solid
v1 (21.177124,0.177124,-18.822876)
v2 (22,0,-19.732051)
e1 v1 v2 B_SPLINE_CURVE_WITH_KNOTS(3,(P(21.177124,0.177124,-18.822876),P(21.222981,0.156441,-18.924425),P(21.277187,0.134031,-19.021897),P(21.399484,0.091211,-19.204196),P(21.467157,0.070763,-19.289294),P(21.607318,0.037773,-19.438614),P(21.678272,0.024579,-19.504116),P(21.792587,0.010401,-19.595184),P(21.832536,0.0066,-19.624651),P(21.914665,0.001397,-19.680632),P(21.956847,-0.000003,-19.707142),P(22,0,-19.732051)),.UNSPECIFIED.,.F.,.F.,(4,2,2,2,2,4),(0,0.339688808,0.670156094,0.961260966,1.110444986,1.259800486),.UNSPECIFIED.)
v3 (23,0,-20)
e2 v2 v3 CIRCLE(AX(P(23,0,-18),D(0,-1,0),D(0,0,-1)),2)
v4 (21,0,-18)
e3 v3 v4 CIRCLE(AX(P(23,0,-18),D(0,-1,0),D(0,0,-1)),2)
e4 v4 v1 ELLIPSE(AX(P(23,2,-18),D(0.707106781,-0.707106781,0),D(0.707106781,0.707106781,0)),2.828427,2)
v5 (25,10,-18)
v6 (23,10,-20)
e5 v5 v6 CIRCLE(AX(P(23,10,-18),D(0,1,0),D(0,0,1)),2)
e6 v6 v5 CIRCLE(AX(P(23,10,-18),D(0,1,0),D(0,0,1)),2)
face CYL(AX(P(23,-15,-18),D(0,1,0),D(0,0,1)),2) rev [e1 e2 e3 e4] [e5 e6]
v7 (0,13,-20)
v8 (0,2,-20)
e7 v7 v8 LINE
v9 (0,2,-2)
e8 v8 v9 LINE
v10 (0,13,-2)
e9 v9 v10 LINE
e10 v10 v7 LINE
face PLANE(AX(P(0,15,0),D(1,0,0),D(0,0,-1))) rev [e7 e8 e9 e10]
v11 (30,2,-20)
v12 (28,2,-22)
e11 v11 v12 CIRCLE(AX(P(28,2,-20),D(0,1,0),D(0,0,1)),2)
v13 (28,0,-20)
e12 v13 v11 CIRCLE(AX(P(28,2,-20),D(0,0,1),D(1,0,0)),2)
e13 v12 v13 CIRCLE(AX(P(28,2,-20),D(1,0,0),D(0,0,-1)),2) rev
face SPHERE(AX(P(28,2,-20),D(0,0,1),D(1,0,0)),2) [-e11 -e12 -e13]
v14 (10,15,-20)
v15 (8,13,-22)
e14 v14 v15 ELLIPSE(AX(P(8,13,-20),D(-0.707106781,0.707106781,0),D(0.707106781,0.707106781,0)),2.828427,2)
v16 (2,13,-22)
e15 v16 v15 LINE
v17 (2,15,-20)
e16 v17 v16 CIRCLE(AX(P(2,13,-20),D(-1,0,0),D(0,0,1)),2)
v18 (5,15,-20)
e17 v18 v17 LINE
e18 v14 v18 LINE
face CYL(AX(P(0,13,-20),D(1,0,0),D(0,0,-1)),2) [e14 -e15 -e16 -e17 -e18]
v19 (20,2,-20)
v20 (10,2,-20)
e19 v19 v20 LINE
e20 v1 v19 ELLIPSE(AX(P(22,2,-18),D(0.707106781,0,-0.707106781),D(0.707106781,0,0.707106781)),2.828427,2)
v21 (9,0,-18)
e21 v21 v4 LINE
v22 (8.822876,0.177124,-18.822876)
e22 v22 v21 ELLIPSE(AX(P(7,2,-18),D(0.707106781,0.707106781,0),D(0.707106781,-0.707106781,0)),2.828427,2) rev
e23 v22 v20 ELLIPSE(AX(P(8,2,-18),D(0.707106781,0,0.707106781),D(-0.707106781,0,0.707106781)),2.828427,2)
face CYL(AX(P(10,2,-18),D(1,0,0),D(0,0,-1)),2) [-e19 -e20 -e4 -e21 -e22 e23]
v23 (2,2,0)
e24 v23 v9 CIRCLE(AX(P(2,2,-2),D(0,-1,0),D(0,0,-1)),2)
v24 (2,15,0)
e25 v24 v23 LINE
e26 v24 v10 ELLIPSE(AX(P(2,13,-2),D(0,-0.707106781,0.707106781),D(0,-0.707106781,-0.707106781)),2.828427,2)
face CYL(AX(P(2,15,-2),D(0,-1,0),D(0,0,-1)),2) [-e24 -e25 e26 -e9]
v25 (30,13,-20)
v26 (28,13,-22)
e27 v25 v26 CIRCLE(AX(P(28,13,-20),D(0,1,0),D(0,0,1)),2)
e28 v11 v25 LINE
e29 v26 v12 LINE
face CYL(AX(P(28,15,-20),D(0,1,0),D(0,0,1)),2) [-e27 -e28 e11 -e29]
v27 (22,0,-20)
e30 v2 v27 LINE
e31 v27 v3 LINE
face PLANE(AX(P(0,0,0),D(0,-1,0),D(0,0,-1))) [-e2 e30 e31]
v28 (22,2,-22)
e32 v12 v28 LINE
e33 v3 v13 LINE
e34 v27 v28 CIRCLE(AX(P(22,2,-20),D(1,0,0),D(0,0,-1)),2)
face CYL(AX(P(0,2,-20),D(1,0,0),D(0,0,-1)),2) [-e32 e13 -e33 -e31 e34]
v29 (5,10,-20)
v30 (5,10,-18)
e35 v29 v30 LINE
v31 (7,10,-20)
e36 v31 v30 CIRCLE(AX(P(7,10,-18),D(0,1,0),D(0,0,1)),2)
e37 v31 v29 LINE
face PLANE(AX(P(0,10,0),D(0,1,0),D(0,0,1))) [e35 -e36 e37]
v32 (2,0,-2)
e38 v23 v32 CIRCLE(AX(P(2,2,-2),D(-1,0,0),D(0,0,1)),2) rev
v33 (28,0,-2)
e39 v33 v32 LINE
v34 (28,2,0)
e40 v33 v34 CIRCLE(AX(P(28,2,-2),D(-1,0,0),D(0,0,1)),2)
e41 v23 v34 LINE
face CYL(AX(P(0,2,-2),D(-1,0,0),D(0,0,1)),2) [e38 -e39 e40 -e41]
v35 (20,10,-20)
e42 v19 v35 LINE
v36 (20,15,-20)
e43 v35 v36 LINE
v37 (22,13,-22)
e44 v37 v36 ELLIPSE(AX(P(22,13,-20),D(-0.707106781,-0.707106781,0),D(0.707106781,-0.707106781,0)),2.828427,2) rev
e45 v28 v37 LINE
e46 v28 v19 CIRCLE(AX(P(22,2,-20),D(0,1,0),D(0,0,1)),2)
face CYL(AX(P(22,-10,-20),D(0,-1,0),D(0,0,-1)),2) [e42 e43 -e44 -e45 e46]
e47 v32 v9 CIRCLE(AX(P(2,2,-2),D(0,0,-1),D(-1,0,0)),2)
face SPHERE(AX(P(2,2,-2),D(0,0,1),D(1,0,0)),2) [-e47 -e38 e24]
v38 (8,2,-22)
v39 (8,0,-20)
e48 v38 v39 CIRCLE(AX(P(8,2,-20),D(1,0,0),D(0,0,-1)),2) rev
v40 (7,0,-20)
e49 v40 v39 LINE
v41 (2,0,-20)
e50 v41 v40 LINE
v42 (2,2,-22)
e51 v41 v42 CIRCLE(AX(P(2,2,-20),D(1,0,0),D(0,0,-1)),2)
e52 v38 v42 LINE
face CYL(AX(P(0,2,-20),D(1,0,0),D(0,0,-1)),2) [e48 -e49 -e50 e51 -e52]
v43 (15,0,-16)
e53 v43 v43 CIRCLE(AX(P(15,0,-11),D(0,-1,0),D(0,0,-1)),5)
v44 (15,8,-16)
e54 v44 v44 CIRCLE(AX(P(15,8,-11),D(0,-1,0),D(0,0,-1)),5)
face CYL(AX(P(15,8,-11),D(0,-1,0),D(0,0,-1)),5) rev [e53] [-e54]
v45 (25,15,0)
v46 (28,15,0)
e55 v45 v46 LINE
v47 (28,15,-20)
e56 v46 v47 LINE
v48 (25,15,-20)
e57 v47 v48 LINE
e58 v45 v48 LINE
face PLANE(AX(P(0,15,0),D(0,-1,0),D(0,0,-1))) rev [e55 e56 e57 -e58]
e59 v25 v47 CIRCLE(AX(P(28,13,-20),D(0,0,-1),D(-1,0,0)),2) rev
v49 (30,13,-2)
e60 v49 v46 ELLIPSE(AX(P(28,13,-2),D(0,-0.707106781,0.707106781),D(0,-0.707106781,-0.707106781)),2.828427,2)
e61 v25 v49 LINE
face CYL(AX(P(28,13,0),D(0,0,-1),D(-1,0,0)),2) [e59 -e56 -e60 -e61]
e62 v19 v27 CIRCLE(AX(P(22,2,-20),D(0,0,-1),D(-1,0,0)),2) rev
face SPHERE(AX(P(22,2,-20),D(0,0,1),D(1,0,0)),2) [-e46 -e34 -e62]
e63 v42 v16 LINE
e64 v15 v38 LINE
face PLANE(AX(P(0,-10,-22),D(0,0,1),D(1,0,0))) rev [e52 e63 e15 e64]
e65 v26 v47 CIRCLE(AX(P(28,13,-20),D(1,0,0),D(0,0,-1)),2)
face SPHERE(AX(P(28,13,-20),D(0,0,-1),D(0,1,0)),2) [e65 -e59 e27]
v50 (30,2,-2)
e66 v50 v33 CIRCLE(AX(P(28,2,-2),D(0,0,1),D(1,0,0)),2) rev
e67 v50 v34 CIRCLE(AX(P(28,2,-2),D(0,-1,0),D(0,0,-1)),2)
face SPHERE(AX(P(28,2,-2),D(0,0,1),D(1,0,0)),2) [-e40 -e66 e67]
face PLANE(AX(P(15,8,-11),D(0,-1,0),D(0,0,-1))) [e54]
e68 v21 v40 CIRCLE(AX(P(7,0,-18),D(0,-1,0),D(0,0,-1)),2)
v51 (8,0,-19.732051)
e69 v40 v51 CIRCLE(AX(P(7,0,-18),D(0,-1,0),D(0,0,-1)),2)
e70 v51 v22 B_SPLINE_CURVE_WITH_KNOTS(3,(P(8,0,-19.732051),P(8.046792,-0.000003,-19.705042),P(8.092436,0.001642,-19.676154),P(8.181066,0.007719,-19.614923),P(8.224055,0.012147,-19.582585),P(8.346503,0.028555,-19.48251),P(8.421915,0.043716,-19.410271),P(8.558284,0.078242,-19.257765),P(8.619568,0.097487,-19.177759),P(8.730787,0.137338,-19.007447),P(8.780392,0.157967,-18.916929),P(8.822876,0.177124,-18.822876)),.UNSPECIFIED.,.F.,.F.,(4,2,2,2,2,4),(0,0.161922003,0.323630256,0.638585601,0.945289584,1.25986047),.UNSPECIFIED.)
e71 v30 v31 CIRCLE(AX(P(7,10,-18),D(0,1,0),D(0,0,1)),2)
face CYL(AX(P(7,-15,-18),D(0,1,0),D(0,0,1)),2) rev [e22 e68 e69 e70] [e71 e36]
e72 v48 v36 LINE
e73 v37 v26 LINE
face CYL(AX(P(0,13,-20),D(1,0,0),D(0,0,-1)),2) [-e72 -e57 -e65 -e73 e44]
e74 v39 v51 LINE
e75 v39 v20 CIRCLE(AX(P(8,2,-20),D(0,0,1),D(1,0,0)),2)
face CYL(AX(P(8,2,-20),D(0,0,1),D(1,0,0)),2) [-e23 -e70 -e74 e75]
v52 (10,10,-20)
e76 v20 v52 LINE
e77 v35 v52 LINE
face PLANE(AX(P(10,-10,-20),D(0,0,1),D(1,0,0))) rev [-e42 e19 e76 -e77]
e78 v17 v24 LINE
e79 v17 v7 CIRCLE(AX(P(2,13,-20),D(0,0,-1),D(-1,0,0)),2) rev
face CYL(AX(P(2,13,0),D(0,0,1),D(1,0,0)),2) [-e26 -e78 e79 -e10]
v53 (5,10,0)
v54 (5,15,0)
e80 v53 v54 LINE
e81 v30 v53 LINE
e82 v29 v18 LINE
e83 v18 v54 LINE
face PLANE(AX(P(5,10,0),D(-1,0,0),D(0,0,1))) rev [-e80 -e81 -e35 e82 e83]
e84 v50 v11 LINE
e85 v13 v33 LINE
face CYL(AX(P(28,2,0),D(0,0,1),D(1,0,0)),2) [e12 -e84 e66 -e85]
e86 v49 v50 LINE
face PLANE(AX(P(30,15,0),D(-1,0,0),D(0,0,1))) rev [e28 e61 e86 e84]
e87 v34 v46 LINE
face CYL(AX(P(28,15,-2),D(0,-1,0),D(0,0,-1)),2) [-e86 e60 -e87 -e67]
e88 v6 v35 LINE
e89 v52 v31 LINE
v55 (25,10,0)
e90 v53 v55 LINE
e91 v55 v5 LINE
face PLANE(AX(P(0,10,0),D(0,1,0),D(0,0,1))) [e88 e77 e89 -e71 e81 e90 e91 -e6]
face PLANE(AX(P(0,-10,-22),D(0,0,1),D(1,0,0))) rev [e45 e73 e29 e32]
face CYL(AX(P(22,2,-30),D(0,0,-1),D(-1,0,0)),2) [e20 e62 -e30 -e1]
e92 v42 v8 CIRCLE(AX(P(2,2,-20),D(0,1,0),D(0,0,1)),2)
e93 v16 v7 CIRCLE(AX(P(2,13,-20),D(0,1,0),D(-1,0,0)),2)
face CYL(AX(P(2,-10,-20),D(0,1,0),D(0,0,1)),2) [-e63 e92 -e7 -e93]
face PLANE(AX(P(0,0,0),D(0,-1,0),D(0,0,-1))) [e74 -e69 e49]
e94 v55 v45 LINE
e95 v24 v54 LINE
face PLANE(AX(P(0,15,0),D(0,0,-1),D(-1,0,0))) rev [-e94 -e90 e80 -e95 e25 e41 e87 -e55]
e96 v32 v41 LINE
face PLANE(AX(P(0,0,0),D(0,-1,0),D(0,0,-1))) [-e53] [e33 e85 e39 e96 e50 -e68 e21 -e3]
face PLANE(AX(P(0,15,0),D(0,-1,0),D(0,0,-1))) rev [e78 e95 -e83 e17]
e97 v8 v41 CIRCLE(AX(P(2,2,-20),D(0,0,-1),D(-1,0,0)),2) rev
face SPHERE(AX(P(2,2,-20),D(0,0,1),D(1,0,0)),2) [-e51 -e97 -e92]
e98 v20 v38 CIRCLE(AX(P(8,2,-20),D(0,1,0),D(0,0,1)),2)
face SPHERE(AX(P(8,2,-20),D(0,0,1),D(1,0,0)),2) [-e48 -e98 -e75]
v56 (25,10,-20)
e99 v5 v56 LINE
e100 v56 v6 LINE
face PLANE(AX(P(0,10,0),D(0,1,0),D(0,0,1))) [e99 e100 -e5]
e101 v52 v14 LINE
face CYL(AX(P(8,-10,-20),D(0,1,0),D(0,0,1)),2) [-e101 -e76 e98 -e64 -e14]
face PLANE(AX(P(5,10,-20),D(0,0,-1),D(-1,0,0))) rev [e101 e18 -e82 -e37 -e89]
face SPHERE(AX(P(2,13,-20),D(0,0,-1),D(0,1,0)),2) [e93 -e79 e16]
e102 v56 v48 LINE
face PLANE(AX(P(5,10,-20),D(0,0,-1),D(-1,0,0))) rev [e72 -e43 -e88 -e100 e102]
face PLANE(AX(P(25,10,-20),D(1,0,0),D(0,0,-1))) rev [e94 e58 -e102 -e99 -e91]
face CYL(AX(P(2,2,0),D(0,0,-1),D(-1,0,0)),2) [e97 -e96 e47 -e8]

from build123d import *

# Parameters (mm, degrees)
SKETCH1_W           = 30
SKETCH1_H           = 30
BOSS_EXTRUDE2_DEPTH = 15
SKETCH3_W           = 20
SKETCH3_H           = 20
CUT_EXTRUDE1_DEPTH  = 5
SKETCH4_R           = 5
CUT_EXTRUDE2_DEPTH  = 8
SKETCH7_R           = 2
CUT_EXTRUDE4_DEPTH  = 25
SKETCH8_W           = 10
SKETCH8_H           = 10
CUT_EXTRUDE7_DEPTH  = 25
SKETCH9_W           = 30
SKETCH9_H           = 8
CUT_EXTRUDE8_DEPTH  = 25
FILLET1_R           = 2
FILLET2_R           = 2


with BuildPart() as part:
    # Sketch1 → Boss-Extrude2 (new body)
    with BuildSketch(Plane(origin=(0, 0, 0), x_dir=(1, 0, 0), z_dir=(0, 1, 0))):
        with Locations((15, 15)):
            Rectangle(SKETCH1_W, SKETCH1_H)
    extrude(amount=BOSS_EXTRUDE2_DEPTH)

    # Sketch3 → Cut-Extrude1 (cut)
    with BuildSketch(Plane(origin=(0, 15, 0), x_dir=(1, 0, 0), z_dir=(0, 1, 0))):
        with Locations((15, 10)):
            Rectangle(SKETCH3_W, SKETCH3_H)
    extrude(amount=-CUT_EXTRUDE1_DEPTH, mode=Mode.SUBTRACT)

    # Sketch4 → Cut-Extrude2 (cut)
    with BuildSketch(Plane.XZ):
        with Locations(Location((15, -11, 0), (0, 0, 270))):
            Circle(SKETCH4_R)
    extrude(amount=-CUT_EXTRUDE2_DEPTH, mode=Mode.SUBTRACT)

    # Sketch7 → Cut-Extrude4 (cut)
    with BuildSketch(Plane(origin=(0, 10, 0), x_dir=(1, 0, 0), z_dir=(0, 1, 0))):
        with Locations(Location((7, 18, 0), (0, 0, 90))):
            Circle(SKETCH7_R)
        with Locations(Location((23, 18, 0), (0, 0, 90))):
            Circle(SKETCH7_R)
    extrude(amount=-CUT_EXTRUDE4_DEPTH, mode=Mode.SUBTRACT)

    # Sketch8 → Cut-Extrude7 (cut)
    with BuildSketch(Plane(origin=(0, 15, 0), x_dir=(1, 0, 0), z_dir=(0, 1, 0))):
        with Locations((15, 25)):
            Rectangle(SKETCH8_W, SKETCH8_H)
    extrude(amount=-CUT_EXTRUDE7_DEPTH, mode=Mode.SUBTRACT)

    # Sketch9 → Cut-Extrude8 (cut)
    with BuildSketch(Plane(origin=(0, 15, 0), x_dir=(1, 0, 0), z_dir=(0, 1, 0))):
        with Locations((15, 26)):
            Rectangle(SKETCH9_W, SKETCH9_H)
    extrude(amount=-CUT_EXTRUDE8_DEPTH, mode=Mode.SUBTRACT)

    # Fillet1
    # the kernel refuses this fillet: 2 mm, written as the material it takes off along each edge
    with BuildSketch(Plane(origin=(20, 0, -20), x_dir=(1, 0, 0), z_dir=(0, 0, -1)), Plane(origin=(10, 0, -27), x_dir=(-1, 0, 0), z_dir=(0, 0, 1))) as fillet1_piece_1:
        with BuildLine():
            CenterArc((FILLET1_R, -FILLET1_R), FILLET1_R, 90, 90)
            Line((0, -FILLET1_R), (0, 0))
            Line((0, 0), (FILLET1_R, 0))
        make_face()
    extrude(amount=7, mode=Mode.SUBTRACT)
    with BuildSketch(Plane(origin=(10, 0, -20), x_dir=(0, 0, 1), z_dir=(1, 0, 0))) as fillet1_piece_2:
        with BuildLine():
            CenterArc((FILLET1_R, -FILLET1_R), FILLET1_R, 90, 90)
            Line((0, -FILLET1_R), (0, 0))
            Line((0, 0), (FILLET1_R, 0))
        make_face()
    extrude(amount=10, mode=Mode.SUBTRACT)
    with BuildSketch(Plane(origin=(15, 0, -22), x_dir=(0, 0, 1), z_dir=(-1, 0, 0)), Plane(origin=(35, 0, -22), x_dir=(0, 0, 1), z_dir=(-1, 0, 0))) as fillet1_piece_3:
        with BuildLine():
            CenterArc((FILLET1_R, FILLET1_R), FILLET1_R, 180, 90)
            Line((0, FILLET1_R), (0, 0))
            Line((0, 0), (FILLET1_R, 0))
        make_face()
    extrude(amount=20, mode=Mode.SUBTRACT)
    with BuildSketch(Plane(origin=(0, 0, -27), x_dir=(1, 0, 0), z_dir=(0, 0, 1)), Plane(origin=(30, 0, 5), x_dir=(-1, 0, 0), z_dir=(0, 0, -1))) as fillet1_piece_4:
        with BuildLine():
            CenterArc((FILLET1_R, FILLET1_R), FILLET1_R, 180, 90)
            Line((0, FILLET1_R), (0, 0))
            Line((0, 0), (FILLET1_R, 0))
        make_face()
    extrude(amount=32, mode=Mode.SUBTRACT)
    with BuildSketch(Plane(origin=(-5, 0, 0), x_dir=(0, 1, 0), z_dir=(1, 0, 0))) as fillet1_piece_5:
        with BuildLine():
            CenterArc((FILLET1_R, -FILLET1_R), FILLET1_R, 90, 90)
            Line((0, -FILLET1_R), (0, 0))
            Line((0, 0), (FILLET1_R, 0))
        make_face()
    extrude(amount=40, mode=Mode.SUBTRACT)
    with BuildSketch(Plane(origin=(10, 0, -20), x_dir=(0, 0, 1), z_dir=(1, 0, 0))) as fillet1_piece_6a_section:
        with BuildLine():
            CenterArc((FILLET1_R, -FILLET1_R), FILLET1_R, 90, 90)
            Line((0, -FILLET1_R), (0, 0))
            Line((0, 0), (FILLET1_R, 0))
        make_face()
    fillet1_piece_6a = extrude(amount=15, mode=Mode.PRIVATE)
    fillet1_piece_6a = split(fillet1_piece_6a, bisect_by=Plane(origin=(20, 0.452790229, -19.547209771), z_dir=(1, 0, 0)), keep=Keep.TOP, mode=Mode.PRIVATE)
    with BuildSketch(Plane(origin=(20, 0, -15), x_dir=(1, 0, 0), z_dir=(0, 0, -1))) as fillet1_piece_6b_section:
        with BuildLine():
            CenterArc((FILLET1_R, -FILLET1_R), FILLET1_R, 90, 90)
            Line((0, -FILLET1_R), (0, 0))
            Line((0, 0), (FILLET1_R, 0))
        make_face()
    fillet1_piece_6b = extrude(amount=12, mode=Mode.PRIVATE)
    fillet1_piece_6b = split(fillet1_piece_6b, bisect_by=Plane(origin=(20.452790229, 0.452790229, -20), z_dir=(0, 0, 1)), keep=Keep.TOP, mode=Mode.PRIVATE)
    fillet1_piece_6 = fillet1_piece_6a & fillet1_piece_6b
    add(fillet1_piece_6, mode=Mode.SUBTRACT)
    with BuildSketch(Plane(origin=(10, 0, -27), x_dir=(-1, 0, 0), z_dir=(0, 0, 1))) as fillet1_piece_7a_section:
        with BuildLine():
            CenterArc((FILLET1_R, -FILLET1_R), FILLET1_R, 90, 90)
            Line((0, -FILLET1_R), (0, 0))
            Line((0, 0), (FILLET1_R, 0))
        make_face()
    fillet1_piece_7a = extrude(amount=12, mode=Mode.PRIVATE)
    fillet1_piece_7a = split(fillet1_piece_7a, bisect_by=Plane(origin=(9.547209771, 0.452790229, -20), z_dir=(0, 0, 1)), keep=Keep.TOP, mode=Mode.PRIVATE)
    with BuildSketch(Plane(origin=(5, 0, -20), x_dir=(0, 0, 1), z_dir=(1, 0, 0))) as fillet1_piece_7b_section:
        with BuildLine():
            CenterArc((FILLET1_R, -FILLET1_R), FILLET1_R, 90, 90)
            Line((0, -FILLET1_R), (0, 0))
            Line((0, 0), (FILLET1_R, 0))
        make_face()
    fillet1_piece_7b = extrude(amount=15, mode=Mode.PRIVATE)
    fillet1_piece_7b = split(fillet1_piece_7b, bisect_by=Plane(origin=(10, 0.452790229, -19.547209771), z_dir=(-1, 0, 0)), keep=Keep.TOP, mode=Mode.PRIVATE)
    fillet1_piece_7 = fillet1_piece_7a & fillet1_piece_7b
    add(fillet1_piece_7, mode=Mode.SUBTRACT)

    # Fillet2
    # the kernel refuses this fillet: 2 mm, written as the material it takes off along each edge
    with BuildSketch(Plane(origin=(2, 2, -2), x_dir=(-1, 0, 0), z_dir=(0, 0, 1))) as fillet2_piece_1_section:
        Polygon((0, 0), (FILLET2_R, 0), (FILLET2_R, FILLET2_R), (0, FILLET2_R), align=None)
    fillet2_piece_1 = extrude(amount=FILLET2_R, mode=Mode.PRIVATE)
    fillet2_piece_1 = fillet2_piece_1 - Plane(origin=(2, 2, -2), x_dir=(0.7071067811865475, 0.7071067811865475, 0), z_dir=(0, 0, 1)) * Sphere(FILLET2_R, mode=Mode.PRIVATE)
    add(fillet2_piece_1, mode=Mode.SUBTRACT)
    with BuildSketch(Plane(origin=(2, 2, -20), x_dir=(0, 0, -1), z_dir=(-1, 0, 0))) as fillet2_piece_2_section:
        Polygon((0, 0), (FILLET2_R, 0), (FILLET2_R, FILLET2_R), (0, FILLET2_R), align=None)
    fillet2_piece_2 = extrude(amount=FILLET2_R, mode=Mode.PRIVATE)
    fillet2_piece_2 = fillet2_piece_2 - Plane(origin=(2, 2, -20), x_dir=(0, 0.7071067811865475, 0.7071067811865475), z_dir=(-1, 0, 0)) * Sphere(FILLET2_R, mode=Mode.PRIVATE)
    add(fillet2_piece_2, mode=Mode.SUBTRACT)
    with BuildSketch(Plane(origin=(8, 2, -20), x_dir=(1, 0, 0), z_dir=(0, 0, -1))) as fillet2_piece_3_section:
        Polygon((0, 0), (FILLET2_R, 0), (FILLET2_R, FILLET2_R), (0, FILLET2_R), align=None)
    fillet2_piece_3 = extrude(amount=FILLET2_R, mode=Mode.PRIVATE)
    fillet2_piece_3 = fillet2_piece_3 - Plane(origin=(8, 2, -20), x_dir=(-0.7071067811865475, 0.7071067811865475, 0), z_dir=(0, 0, -1)) * Sphere(FILLET2_R, mode=Mode.PRIVATE)
    add(fillet2_piece_3, mode=Mode.SUBTRACT)
    with BuildSketch(Plane(origin=(28, 2, -2), x_dir=(1, 0, 0), z_dir=(0, 0, 1))) as fillet2_piece_4_section:
        Polygon((0, 0), (FILLET2_R, 0), (FILLET2_R, -FILLET2_R), (0, -FILLET2_R), align=None)
    fillet2_piece_4 = extrude(amount=FILLET2_R, mode=Mode.PRIVATE)
    fillet2_piece_4 = fillet2_piece_4 - Plane(origin=(28, 2, -2), x_dir=(-0.7071067811865475, 0.7071067811865475, 0), z_dir=(0, 0, 1)) * Sphere(FILLET2_R, mode=Mode.PRIVATE)
    add(fillet2_piece_4, mode=Mode.SUBTRACT)
    with BuildSketch(Plane(origin=(22, 2, -20), x_dir=(0, 0, -1), z_dir=(-1, 0, 0))) as fillet2_piece_5_section:
        Polygon((0, 0), (FILLET2_R, 0), (FILLET2_R, FILLET2_R), (0, FILLET2_R), align=None)
    fillet2_piece_5 = extrude(amount=FILLET2_R, mode=Mode.PRIVATE)
    fillet2_piece_5 = fillet2_piece_5 - Plane(origin=(22, 2, -20), x_dir=(0, 0.7071067811865475, 0.7071067811865475), z_dir=(-1, 0, 0)) * Sphere(FILLET2_R, mode=Mode.PRIVATE)
    add(fillet2_piece_5, mode=Mode.SUBTRACT)
    with BuildSketch(Plane(origin=(28, 2, -20), x_dir=(1, 0, 0), z_dir=(0, 0, -1))) as fillet2_piece_6_section:
        Polygon((0, 0), (FILLET2_R, 0), (FILLET2_R, FILLET2_R), (0, FILLET2_R), align=None)
    fillet2_piece_6 = extrude(amount=FILLET2_R, mode=Mode.PRIVATE)
    fillet2_piece_6 = fillet2_piece_6 - Plane(origin=(28, 2, -20), x_dir=(-0.7071067811865475, 0.7071067811865475, 0), z_dir=(0, 0, -1)) * Sphere(FILLET2_R, mode=Mode.PRIVATE)
    add(fillet2_piece_6, mode=Mode.SUBTRACT)
    with BuildSketch(Plane(origin=(2, 13, -20), x_dir=(0, 0, -1), z_dir=(-1, 0, 0))) as fillet2_piece_7_section:
        Polygon((0, 0), (FILLET2_R, 0), (FILLET2_R, -FILLET2_R), (0, -FILLET2_R), align=None)
    fillet2_piece_7 = extrude(amount=FILLET2_R, mode=Mode.PRIVATE)
    fillet2_piece_7 = fillet2_piece_7 - Plane(origin=(2, 13, -20), x_dir=(0, -0.7071067811865475, 0.7071067811865475), z_dir=(-1, 0, 0)) * Sphere(FILLET2_R, mode=Mode.PRIVATE)
    add(fillet2_piece_7, mode=Mode.SUBTRACT)
    with BuildSketch(Plane(origin=(28, 13, -20), x_dir=(1, 0, 0), z_dir=(0, 1, 0))) as fillet2_piece_8_section:
        Polygon((0, 0), (FILLET2_R, 0), (FILLET2_R, FILLET2_R), (0, FILLET2_R), align=None)
    fillet2_piece_8 = extrude(amount=FILLET2_R, mode=Mode.PRIVATE)
    fillet2_piece_8 = fillet2_piece_8 - Plane(origin=(28, 13, -20), x_dir=(-0.7071067811865475, 0, 0.7071067811865475), z_dir=(0, 1, 0)) * Sphere(FILLET2_R, mode=Mode.PRIVATE)
    add(fillet2_piece_8, mode=Mode.SUBTRACT)
    with BuildSketch(Plane(origin=(0, 15, -20), x_dir=(0, -1, 0), z_dir=(0, 0, 1))) as fillet2_piece_9:
        with BuildLine():
            CenterArc((FILLET2_R, FILLET2_R), FILLET2_R, 180, 90)
            Line((0, FILLET2_R), (0, 0))
            Line((0, 0), (FILLET2_R, 0))
        make_face()
    extrude(amount=25, mode=Mode.SUBTRACT)
    with BuildSketch(Plane(origin=(0, 2, 0), x_dir=(1, 0, 0), z_dir=(0, 1, 0)), Plane(origin=(20, 2, -22), x_dir=(0, 0, 1), z_dir=(0, 1, 0))) as fillet2_piece_10:
        with BuildLine():
            CenterArc((FILLET2_R, FILLET2_R), FILLET2_R, 180, 90)
            Line((0, FILLET2_R), (0, 0))
            Line((0, 0), (FILLET2_R, 0))
        make_face()
    extrude(amount=18, mode=Mode.SUBTRACT)
    with BuildSketch(Plane(origin=(15, 15, -22), x_dir=(0, -1, 0), z_dir=(-1, 0, 0)), Plane(origin=(28, 15, -22), x_dir=(0, -1, 0), z_dir=(-1, 0, 0))) as fillet2_piece_11:
        with BuildLine():
            CenterArc((FILLET2_R, FILLET2_R), FILLET2_R, 180, 90)
            Line((0, FILLET2_R), (0, 0))
            Line((0, 0), (FILLET2_R, 0))
        make_face()
    extrude(amount=13, mode=Mode.SUBTRACT)
    with BuildSketch(Plane(origin=(0, 13, -22), x_dir=(0, 0, 1), z_dir=(0, -1, 0)), Plane(origin=(30, 13, -22), x_dir=(-1, 0, 0), z_dir=(0, -1, 0))) as fillet2_piece_12:
        with BuildLine():
            CenterArc((FILLET2_R, -FILLET2_R), FILLET2_R, 90, 90)
            Line((0, -FILLET2_R), (0, 0))
            Line((0, 0), (FILLET2_R, 0))
        make_face()
    extrude(amount=11, mode=Mode.SUBTRACT)
    with BuildSketch(Plane(origin=(10, 20, -22), x_dir=(-1, 0, 0), z_dir=(0, -1, 0)), Plane(origin=(30, 2, 0), x_dir=(-1, 0, 0), z_dir=(0, 1, 0))) as fillet2_piece_13:
        with BuildLine():
            CenterArc((FILLET2_R, -FILLET2_R), FILLET2_R, 90, 90)
            Line((0, -FILLET2_R), (0, 0))
            Line((0, 0), (FILLET2_R, 0))
        make_face()
    extrude(amount=18, mode=Mode.SUBTRACT)
    with BuildSketch(Plane(origin=(30, 15, 5), x_dir=(-1, 0, 0), z_dir=(0, 0, -1))) as fillet2_piece_14:
        with BuildLine():
            CenterArc((FILLET2_R, -FILLET2_R), FILLET2_R, 90, 90)
            Line((0, -FILLET2_R), (0, 0))
            Line((0, 0), (FILLET2_R, 0))
        make_face()
    extrude(amount=25, mode=Mode.SUBTRACT)


solid = part.part
